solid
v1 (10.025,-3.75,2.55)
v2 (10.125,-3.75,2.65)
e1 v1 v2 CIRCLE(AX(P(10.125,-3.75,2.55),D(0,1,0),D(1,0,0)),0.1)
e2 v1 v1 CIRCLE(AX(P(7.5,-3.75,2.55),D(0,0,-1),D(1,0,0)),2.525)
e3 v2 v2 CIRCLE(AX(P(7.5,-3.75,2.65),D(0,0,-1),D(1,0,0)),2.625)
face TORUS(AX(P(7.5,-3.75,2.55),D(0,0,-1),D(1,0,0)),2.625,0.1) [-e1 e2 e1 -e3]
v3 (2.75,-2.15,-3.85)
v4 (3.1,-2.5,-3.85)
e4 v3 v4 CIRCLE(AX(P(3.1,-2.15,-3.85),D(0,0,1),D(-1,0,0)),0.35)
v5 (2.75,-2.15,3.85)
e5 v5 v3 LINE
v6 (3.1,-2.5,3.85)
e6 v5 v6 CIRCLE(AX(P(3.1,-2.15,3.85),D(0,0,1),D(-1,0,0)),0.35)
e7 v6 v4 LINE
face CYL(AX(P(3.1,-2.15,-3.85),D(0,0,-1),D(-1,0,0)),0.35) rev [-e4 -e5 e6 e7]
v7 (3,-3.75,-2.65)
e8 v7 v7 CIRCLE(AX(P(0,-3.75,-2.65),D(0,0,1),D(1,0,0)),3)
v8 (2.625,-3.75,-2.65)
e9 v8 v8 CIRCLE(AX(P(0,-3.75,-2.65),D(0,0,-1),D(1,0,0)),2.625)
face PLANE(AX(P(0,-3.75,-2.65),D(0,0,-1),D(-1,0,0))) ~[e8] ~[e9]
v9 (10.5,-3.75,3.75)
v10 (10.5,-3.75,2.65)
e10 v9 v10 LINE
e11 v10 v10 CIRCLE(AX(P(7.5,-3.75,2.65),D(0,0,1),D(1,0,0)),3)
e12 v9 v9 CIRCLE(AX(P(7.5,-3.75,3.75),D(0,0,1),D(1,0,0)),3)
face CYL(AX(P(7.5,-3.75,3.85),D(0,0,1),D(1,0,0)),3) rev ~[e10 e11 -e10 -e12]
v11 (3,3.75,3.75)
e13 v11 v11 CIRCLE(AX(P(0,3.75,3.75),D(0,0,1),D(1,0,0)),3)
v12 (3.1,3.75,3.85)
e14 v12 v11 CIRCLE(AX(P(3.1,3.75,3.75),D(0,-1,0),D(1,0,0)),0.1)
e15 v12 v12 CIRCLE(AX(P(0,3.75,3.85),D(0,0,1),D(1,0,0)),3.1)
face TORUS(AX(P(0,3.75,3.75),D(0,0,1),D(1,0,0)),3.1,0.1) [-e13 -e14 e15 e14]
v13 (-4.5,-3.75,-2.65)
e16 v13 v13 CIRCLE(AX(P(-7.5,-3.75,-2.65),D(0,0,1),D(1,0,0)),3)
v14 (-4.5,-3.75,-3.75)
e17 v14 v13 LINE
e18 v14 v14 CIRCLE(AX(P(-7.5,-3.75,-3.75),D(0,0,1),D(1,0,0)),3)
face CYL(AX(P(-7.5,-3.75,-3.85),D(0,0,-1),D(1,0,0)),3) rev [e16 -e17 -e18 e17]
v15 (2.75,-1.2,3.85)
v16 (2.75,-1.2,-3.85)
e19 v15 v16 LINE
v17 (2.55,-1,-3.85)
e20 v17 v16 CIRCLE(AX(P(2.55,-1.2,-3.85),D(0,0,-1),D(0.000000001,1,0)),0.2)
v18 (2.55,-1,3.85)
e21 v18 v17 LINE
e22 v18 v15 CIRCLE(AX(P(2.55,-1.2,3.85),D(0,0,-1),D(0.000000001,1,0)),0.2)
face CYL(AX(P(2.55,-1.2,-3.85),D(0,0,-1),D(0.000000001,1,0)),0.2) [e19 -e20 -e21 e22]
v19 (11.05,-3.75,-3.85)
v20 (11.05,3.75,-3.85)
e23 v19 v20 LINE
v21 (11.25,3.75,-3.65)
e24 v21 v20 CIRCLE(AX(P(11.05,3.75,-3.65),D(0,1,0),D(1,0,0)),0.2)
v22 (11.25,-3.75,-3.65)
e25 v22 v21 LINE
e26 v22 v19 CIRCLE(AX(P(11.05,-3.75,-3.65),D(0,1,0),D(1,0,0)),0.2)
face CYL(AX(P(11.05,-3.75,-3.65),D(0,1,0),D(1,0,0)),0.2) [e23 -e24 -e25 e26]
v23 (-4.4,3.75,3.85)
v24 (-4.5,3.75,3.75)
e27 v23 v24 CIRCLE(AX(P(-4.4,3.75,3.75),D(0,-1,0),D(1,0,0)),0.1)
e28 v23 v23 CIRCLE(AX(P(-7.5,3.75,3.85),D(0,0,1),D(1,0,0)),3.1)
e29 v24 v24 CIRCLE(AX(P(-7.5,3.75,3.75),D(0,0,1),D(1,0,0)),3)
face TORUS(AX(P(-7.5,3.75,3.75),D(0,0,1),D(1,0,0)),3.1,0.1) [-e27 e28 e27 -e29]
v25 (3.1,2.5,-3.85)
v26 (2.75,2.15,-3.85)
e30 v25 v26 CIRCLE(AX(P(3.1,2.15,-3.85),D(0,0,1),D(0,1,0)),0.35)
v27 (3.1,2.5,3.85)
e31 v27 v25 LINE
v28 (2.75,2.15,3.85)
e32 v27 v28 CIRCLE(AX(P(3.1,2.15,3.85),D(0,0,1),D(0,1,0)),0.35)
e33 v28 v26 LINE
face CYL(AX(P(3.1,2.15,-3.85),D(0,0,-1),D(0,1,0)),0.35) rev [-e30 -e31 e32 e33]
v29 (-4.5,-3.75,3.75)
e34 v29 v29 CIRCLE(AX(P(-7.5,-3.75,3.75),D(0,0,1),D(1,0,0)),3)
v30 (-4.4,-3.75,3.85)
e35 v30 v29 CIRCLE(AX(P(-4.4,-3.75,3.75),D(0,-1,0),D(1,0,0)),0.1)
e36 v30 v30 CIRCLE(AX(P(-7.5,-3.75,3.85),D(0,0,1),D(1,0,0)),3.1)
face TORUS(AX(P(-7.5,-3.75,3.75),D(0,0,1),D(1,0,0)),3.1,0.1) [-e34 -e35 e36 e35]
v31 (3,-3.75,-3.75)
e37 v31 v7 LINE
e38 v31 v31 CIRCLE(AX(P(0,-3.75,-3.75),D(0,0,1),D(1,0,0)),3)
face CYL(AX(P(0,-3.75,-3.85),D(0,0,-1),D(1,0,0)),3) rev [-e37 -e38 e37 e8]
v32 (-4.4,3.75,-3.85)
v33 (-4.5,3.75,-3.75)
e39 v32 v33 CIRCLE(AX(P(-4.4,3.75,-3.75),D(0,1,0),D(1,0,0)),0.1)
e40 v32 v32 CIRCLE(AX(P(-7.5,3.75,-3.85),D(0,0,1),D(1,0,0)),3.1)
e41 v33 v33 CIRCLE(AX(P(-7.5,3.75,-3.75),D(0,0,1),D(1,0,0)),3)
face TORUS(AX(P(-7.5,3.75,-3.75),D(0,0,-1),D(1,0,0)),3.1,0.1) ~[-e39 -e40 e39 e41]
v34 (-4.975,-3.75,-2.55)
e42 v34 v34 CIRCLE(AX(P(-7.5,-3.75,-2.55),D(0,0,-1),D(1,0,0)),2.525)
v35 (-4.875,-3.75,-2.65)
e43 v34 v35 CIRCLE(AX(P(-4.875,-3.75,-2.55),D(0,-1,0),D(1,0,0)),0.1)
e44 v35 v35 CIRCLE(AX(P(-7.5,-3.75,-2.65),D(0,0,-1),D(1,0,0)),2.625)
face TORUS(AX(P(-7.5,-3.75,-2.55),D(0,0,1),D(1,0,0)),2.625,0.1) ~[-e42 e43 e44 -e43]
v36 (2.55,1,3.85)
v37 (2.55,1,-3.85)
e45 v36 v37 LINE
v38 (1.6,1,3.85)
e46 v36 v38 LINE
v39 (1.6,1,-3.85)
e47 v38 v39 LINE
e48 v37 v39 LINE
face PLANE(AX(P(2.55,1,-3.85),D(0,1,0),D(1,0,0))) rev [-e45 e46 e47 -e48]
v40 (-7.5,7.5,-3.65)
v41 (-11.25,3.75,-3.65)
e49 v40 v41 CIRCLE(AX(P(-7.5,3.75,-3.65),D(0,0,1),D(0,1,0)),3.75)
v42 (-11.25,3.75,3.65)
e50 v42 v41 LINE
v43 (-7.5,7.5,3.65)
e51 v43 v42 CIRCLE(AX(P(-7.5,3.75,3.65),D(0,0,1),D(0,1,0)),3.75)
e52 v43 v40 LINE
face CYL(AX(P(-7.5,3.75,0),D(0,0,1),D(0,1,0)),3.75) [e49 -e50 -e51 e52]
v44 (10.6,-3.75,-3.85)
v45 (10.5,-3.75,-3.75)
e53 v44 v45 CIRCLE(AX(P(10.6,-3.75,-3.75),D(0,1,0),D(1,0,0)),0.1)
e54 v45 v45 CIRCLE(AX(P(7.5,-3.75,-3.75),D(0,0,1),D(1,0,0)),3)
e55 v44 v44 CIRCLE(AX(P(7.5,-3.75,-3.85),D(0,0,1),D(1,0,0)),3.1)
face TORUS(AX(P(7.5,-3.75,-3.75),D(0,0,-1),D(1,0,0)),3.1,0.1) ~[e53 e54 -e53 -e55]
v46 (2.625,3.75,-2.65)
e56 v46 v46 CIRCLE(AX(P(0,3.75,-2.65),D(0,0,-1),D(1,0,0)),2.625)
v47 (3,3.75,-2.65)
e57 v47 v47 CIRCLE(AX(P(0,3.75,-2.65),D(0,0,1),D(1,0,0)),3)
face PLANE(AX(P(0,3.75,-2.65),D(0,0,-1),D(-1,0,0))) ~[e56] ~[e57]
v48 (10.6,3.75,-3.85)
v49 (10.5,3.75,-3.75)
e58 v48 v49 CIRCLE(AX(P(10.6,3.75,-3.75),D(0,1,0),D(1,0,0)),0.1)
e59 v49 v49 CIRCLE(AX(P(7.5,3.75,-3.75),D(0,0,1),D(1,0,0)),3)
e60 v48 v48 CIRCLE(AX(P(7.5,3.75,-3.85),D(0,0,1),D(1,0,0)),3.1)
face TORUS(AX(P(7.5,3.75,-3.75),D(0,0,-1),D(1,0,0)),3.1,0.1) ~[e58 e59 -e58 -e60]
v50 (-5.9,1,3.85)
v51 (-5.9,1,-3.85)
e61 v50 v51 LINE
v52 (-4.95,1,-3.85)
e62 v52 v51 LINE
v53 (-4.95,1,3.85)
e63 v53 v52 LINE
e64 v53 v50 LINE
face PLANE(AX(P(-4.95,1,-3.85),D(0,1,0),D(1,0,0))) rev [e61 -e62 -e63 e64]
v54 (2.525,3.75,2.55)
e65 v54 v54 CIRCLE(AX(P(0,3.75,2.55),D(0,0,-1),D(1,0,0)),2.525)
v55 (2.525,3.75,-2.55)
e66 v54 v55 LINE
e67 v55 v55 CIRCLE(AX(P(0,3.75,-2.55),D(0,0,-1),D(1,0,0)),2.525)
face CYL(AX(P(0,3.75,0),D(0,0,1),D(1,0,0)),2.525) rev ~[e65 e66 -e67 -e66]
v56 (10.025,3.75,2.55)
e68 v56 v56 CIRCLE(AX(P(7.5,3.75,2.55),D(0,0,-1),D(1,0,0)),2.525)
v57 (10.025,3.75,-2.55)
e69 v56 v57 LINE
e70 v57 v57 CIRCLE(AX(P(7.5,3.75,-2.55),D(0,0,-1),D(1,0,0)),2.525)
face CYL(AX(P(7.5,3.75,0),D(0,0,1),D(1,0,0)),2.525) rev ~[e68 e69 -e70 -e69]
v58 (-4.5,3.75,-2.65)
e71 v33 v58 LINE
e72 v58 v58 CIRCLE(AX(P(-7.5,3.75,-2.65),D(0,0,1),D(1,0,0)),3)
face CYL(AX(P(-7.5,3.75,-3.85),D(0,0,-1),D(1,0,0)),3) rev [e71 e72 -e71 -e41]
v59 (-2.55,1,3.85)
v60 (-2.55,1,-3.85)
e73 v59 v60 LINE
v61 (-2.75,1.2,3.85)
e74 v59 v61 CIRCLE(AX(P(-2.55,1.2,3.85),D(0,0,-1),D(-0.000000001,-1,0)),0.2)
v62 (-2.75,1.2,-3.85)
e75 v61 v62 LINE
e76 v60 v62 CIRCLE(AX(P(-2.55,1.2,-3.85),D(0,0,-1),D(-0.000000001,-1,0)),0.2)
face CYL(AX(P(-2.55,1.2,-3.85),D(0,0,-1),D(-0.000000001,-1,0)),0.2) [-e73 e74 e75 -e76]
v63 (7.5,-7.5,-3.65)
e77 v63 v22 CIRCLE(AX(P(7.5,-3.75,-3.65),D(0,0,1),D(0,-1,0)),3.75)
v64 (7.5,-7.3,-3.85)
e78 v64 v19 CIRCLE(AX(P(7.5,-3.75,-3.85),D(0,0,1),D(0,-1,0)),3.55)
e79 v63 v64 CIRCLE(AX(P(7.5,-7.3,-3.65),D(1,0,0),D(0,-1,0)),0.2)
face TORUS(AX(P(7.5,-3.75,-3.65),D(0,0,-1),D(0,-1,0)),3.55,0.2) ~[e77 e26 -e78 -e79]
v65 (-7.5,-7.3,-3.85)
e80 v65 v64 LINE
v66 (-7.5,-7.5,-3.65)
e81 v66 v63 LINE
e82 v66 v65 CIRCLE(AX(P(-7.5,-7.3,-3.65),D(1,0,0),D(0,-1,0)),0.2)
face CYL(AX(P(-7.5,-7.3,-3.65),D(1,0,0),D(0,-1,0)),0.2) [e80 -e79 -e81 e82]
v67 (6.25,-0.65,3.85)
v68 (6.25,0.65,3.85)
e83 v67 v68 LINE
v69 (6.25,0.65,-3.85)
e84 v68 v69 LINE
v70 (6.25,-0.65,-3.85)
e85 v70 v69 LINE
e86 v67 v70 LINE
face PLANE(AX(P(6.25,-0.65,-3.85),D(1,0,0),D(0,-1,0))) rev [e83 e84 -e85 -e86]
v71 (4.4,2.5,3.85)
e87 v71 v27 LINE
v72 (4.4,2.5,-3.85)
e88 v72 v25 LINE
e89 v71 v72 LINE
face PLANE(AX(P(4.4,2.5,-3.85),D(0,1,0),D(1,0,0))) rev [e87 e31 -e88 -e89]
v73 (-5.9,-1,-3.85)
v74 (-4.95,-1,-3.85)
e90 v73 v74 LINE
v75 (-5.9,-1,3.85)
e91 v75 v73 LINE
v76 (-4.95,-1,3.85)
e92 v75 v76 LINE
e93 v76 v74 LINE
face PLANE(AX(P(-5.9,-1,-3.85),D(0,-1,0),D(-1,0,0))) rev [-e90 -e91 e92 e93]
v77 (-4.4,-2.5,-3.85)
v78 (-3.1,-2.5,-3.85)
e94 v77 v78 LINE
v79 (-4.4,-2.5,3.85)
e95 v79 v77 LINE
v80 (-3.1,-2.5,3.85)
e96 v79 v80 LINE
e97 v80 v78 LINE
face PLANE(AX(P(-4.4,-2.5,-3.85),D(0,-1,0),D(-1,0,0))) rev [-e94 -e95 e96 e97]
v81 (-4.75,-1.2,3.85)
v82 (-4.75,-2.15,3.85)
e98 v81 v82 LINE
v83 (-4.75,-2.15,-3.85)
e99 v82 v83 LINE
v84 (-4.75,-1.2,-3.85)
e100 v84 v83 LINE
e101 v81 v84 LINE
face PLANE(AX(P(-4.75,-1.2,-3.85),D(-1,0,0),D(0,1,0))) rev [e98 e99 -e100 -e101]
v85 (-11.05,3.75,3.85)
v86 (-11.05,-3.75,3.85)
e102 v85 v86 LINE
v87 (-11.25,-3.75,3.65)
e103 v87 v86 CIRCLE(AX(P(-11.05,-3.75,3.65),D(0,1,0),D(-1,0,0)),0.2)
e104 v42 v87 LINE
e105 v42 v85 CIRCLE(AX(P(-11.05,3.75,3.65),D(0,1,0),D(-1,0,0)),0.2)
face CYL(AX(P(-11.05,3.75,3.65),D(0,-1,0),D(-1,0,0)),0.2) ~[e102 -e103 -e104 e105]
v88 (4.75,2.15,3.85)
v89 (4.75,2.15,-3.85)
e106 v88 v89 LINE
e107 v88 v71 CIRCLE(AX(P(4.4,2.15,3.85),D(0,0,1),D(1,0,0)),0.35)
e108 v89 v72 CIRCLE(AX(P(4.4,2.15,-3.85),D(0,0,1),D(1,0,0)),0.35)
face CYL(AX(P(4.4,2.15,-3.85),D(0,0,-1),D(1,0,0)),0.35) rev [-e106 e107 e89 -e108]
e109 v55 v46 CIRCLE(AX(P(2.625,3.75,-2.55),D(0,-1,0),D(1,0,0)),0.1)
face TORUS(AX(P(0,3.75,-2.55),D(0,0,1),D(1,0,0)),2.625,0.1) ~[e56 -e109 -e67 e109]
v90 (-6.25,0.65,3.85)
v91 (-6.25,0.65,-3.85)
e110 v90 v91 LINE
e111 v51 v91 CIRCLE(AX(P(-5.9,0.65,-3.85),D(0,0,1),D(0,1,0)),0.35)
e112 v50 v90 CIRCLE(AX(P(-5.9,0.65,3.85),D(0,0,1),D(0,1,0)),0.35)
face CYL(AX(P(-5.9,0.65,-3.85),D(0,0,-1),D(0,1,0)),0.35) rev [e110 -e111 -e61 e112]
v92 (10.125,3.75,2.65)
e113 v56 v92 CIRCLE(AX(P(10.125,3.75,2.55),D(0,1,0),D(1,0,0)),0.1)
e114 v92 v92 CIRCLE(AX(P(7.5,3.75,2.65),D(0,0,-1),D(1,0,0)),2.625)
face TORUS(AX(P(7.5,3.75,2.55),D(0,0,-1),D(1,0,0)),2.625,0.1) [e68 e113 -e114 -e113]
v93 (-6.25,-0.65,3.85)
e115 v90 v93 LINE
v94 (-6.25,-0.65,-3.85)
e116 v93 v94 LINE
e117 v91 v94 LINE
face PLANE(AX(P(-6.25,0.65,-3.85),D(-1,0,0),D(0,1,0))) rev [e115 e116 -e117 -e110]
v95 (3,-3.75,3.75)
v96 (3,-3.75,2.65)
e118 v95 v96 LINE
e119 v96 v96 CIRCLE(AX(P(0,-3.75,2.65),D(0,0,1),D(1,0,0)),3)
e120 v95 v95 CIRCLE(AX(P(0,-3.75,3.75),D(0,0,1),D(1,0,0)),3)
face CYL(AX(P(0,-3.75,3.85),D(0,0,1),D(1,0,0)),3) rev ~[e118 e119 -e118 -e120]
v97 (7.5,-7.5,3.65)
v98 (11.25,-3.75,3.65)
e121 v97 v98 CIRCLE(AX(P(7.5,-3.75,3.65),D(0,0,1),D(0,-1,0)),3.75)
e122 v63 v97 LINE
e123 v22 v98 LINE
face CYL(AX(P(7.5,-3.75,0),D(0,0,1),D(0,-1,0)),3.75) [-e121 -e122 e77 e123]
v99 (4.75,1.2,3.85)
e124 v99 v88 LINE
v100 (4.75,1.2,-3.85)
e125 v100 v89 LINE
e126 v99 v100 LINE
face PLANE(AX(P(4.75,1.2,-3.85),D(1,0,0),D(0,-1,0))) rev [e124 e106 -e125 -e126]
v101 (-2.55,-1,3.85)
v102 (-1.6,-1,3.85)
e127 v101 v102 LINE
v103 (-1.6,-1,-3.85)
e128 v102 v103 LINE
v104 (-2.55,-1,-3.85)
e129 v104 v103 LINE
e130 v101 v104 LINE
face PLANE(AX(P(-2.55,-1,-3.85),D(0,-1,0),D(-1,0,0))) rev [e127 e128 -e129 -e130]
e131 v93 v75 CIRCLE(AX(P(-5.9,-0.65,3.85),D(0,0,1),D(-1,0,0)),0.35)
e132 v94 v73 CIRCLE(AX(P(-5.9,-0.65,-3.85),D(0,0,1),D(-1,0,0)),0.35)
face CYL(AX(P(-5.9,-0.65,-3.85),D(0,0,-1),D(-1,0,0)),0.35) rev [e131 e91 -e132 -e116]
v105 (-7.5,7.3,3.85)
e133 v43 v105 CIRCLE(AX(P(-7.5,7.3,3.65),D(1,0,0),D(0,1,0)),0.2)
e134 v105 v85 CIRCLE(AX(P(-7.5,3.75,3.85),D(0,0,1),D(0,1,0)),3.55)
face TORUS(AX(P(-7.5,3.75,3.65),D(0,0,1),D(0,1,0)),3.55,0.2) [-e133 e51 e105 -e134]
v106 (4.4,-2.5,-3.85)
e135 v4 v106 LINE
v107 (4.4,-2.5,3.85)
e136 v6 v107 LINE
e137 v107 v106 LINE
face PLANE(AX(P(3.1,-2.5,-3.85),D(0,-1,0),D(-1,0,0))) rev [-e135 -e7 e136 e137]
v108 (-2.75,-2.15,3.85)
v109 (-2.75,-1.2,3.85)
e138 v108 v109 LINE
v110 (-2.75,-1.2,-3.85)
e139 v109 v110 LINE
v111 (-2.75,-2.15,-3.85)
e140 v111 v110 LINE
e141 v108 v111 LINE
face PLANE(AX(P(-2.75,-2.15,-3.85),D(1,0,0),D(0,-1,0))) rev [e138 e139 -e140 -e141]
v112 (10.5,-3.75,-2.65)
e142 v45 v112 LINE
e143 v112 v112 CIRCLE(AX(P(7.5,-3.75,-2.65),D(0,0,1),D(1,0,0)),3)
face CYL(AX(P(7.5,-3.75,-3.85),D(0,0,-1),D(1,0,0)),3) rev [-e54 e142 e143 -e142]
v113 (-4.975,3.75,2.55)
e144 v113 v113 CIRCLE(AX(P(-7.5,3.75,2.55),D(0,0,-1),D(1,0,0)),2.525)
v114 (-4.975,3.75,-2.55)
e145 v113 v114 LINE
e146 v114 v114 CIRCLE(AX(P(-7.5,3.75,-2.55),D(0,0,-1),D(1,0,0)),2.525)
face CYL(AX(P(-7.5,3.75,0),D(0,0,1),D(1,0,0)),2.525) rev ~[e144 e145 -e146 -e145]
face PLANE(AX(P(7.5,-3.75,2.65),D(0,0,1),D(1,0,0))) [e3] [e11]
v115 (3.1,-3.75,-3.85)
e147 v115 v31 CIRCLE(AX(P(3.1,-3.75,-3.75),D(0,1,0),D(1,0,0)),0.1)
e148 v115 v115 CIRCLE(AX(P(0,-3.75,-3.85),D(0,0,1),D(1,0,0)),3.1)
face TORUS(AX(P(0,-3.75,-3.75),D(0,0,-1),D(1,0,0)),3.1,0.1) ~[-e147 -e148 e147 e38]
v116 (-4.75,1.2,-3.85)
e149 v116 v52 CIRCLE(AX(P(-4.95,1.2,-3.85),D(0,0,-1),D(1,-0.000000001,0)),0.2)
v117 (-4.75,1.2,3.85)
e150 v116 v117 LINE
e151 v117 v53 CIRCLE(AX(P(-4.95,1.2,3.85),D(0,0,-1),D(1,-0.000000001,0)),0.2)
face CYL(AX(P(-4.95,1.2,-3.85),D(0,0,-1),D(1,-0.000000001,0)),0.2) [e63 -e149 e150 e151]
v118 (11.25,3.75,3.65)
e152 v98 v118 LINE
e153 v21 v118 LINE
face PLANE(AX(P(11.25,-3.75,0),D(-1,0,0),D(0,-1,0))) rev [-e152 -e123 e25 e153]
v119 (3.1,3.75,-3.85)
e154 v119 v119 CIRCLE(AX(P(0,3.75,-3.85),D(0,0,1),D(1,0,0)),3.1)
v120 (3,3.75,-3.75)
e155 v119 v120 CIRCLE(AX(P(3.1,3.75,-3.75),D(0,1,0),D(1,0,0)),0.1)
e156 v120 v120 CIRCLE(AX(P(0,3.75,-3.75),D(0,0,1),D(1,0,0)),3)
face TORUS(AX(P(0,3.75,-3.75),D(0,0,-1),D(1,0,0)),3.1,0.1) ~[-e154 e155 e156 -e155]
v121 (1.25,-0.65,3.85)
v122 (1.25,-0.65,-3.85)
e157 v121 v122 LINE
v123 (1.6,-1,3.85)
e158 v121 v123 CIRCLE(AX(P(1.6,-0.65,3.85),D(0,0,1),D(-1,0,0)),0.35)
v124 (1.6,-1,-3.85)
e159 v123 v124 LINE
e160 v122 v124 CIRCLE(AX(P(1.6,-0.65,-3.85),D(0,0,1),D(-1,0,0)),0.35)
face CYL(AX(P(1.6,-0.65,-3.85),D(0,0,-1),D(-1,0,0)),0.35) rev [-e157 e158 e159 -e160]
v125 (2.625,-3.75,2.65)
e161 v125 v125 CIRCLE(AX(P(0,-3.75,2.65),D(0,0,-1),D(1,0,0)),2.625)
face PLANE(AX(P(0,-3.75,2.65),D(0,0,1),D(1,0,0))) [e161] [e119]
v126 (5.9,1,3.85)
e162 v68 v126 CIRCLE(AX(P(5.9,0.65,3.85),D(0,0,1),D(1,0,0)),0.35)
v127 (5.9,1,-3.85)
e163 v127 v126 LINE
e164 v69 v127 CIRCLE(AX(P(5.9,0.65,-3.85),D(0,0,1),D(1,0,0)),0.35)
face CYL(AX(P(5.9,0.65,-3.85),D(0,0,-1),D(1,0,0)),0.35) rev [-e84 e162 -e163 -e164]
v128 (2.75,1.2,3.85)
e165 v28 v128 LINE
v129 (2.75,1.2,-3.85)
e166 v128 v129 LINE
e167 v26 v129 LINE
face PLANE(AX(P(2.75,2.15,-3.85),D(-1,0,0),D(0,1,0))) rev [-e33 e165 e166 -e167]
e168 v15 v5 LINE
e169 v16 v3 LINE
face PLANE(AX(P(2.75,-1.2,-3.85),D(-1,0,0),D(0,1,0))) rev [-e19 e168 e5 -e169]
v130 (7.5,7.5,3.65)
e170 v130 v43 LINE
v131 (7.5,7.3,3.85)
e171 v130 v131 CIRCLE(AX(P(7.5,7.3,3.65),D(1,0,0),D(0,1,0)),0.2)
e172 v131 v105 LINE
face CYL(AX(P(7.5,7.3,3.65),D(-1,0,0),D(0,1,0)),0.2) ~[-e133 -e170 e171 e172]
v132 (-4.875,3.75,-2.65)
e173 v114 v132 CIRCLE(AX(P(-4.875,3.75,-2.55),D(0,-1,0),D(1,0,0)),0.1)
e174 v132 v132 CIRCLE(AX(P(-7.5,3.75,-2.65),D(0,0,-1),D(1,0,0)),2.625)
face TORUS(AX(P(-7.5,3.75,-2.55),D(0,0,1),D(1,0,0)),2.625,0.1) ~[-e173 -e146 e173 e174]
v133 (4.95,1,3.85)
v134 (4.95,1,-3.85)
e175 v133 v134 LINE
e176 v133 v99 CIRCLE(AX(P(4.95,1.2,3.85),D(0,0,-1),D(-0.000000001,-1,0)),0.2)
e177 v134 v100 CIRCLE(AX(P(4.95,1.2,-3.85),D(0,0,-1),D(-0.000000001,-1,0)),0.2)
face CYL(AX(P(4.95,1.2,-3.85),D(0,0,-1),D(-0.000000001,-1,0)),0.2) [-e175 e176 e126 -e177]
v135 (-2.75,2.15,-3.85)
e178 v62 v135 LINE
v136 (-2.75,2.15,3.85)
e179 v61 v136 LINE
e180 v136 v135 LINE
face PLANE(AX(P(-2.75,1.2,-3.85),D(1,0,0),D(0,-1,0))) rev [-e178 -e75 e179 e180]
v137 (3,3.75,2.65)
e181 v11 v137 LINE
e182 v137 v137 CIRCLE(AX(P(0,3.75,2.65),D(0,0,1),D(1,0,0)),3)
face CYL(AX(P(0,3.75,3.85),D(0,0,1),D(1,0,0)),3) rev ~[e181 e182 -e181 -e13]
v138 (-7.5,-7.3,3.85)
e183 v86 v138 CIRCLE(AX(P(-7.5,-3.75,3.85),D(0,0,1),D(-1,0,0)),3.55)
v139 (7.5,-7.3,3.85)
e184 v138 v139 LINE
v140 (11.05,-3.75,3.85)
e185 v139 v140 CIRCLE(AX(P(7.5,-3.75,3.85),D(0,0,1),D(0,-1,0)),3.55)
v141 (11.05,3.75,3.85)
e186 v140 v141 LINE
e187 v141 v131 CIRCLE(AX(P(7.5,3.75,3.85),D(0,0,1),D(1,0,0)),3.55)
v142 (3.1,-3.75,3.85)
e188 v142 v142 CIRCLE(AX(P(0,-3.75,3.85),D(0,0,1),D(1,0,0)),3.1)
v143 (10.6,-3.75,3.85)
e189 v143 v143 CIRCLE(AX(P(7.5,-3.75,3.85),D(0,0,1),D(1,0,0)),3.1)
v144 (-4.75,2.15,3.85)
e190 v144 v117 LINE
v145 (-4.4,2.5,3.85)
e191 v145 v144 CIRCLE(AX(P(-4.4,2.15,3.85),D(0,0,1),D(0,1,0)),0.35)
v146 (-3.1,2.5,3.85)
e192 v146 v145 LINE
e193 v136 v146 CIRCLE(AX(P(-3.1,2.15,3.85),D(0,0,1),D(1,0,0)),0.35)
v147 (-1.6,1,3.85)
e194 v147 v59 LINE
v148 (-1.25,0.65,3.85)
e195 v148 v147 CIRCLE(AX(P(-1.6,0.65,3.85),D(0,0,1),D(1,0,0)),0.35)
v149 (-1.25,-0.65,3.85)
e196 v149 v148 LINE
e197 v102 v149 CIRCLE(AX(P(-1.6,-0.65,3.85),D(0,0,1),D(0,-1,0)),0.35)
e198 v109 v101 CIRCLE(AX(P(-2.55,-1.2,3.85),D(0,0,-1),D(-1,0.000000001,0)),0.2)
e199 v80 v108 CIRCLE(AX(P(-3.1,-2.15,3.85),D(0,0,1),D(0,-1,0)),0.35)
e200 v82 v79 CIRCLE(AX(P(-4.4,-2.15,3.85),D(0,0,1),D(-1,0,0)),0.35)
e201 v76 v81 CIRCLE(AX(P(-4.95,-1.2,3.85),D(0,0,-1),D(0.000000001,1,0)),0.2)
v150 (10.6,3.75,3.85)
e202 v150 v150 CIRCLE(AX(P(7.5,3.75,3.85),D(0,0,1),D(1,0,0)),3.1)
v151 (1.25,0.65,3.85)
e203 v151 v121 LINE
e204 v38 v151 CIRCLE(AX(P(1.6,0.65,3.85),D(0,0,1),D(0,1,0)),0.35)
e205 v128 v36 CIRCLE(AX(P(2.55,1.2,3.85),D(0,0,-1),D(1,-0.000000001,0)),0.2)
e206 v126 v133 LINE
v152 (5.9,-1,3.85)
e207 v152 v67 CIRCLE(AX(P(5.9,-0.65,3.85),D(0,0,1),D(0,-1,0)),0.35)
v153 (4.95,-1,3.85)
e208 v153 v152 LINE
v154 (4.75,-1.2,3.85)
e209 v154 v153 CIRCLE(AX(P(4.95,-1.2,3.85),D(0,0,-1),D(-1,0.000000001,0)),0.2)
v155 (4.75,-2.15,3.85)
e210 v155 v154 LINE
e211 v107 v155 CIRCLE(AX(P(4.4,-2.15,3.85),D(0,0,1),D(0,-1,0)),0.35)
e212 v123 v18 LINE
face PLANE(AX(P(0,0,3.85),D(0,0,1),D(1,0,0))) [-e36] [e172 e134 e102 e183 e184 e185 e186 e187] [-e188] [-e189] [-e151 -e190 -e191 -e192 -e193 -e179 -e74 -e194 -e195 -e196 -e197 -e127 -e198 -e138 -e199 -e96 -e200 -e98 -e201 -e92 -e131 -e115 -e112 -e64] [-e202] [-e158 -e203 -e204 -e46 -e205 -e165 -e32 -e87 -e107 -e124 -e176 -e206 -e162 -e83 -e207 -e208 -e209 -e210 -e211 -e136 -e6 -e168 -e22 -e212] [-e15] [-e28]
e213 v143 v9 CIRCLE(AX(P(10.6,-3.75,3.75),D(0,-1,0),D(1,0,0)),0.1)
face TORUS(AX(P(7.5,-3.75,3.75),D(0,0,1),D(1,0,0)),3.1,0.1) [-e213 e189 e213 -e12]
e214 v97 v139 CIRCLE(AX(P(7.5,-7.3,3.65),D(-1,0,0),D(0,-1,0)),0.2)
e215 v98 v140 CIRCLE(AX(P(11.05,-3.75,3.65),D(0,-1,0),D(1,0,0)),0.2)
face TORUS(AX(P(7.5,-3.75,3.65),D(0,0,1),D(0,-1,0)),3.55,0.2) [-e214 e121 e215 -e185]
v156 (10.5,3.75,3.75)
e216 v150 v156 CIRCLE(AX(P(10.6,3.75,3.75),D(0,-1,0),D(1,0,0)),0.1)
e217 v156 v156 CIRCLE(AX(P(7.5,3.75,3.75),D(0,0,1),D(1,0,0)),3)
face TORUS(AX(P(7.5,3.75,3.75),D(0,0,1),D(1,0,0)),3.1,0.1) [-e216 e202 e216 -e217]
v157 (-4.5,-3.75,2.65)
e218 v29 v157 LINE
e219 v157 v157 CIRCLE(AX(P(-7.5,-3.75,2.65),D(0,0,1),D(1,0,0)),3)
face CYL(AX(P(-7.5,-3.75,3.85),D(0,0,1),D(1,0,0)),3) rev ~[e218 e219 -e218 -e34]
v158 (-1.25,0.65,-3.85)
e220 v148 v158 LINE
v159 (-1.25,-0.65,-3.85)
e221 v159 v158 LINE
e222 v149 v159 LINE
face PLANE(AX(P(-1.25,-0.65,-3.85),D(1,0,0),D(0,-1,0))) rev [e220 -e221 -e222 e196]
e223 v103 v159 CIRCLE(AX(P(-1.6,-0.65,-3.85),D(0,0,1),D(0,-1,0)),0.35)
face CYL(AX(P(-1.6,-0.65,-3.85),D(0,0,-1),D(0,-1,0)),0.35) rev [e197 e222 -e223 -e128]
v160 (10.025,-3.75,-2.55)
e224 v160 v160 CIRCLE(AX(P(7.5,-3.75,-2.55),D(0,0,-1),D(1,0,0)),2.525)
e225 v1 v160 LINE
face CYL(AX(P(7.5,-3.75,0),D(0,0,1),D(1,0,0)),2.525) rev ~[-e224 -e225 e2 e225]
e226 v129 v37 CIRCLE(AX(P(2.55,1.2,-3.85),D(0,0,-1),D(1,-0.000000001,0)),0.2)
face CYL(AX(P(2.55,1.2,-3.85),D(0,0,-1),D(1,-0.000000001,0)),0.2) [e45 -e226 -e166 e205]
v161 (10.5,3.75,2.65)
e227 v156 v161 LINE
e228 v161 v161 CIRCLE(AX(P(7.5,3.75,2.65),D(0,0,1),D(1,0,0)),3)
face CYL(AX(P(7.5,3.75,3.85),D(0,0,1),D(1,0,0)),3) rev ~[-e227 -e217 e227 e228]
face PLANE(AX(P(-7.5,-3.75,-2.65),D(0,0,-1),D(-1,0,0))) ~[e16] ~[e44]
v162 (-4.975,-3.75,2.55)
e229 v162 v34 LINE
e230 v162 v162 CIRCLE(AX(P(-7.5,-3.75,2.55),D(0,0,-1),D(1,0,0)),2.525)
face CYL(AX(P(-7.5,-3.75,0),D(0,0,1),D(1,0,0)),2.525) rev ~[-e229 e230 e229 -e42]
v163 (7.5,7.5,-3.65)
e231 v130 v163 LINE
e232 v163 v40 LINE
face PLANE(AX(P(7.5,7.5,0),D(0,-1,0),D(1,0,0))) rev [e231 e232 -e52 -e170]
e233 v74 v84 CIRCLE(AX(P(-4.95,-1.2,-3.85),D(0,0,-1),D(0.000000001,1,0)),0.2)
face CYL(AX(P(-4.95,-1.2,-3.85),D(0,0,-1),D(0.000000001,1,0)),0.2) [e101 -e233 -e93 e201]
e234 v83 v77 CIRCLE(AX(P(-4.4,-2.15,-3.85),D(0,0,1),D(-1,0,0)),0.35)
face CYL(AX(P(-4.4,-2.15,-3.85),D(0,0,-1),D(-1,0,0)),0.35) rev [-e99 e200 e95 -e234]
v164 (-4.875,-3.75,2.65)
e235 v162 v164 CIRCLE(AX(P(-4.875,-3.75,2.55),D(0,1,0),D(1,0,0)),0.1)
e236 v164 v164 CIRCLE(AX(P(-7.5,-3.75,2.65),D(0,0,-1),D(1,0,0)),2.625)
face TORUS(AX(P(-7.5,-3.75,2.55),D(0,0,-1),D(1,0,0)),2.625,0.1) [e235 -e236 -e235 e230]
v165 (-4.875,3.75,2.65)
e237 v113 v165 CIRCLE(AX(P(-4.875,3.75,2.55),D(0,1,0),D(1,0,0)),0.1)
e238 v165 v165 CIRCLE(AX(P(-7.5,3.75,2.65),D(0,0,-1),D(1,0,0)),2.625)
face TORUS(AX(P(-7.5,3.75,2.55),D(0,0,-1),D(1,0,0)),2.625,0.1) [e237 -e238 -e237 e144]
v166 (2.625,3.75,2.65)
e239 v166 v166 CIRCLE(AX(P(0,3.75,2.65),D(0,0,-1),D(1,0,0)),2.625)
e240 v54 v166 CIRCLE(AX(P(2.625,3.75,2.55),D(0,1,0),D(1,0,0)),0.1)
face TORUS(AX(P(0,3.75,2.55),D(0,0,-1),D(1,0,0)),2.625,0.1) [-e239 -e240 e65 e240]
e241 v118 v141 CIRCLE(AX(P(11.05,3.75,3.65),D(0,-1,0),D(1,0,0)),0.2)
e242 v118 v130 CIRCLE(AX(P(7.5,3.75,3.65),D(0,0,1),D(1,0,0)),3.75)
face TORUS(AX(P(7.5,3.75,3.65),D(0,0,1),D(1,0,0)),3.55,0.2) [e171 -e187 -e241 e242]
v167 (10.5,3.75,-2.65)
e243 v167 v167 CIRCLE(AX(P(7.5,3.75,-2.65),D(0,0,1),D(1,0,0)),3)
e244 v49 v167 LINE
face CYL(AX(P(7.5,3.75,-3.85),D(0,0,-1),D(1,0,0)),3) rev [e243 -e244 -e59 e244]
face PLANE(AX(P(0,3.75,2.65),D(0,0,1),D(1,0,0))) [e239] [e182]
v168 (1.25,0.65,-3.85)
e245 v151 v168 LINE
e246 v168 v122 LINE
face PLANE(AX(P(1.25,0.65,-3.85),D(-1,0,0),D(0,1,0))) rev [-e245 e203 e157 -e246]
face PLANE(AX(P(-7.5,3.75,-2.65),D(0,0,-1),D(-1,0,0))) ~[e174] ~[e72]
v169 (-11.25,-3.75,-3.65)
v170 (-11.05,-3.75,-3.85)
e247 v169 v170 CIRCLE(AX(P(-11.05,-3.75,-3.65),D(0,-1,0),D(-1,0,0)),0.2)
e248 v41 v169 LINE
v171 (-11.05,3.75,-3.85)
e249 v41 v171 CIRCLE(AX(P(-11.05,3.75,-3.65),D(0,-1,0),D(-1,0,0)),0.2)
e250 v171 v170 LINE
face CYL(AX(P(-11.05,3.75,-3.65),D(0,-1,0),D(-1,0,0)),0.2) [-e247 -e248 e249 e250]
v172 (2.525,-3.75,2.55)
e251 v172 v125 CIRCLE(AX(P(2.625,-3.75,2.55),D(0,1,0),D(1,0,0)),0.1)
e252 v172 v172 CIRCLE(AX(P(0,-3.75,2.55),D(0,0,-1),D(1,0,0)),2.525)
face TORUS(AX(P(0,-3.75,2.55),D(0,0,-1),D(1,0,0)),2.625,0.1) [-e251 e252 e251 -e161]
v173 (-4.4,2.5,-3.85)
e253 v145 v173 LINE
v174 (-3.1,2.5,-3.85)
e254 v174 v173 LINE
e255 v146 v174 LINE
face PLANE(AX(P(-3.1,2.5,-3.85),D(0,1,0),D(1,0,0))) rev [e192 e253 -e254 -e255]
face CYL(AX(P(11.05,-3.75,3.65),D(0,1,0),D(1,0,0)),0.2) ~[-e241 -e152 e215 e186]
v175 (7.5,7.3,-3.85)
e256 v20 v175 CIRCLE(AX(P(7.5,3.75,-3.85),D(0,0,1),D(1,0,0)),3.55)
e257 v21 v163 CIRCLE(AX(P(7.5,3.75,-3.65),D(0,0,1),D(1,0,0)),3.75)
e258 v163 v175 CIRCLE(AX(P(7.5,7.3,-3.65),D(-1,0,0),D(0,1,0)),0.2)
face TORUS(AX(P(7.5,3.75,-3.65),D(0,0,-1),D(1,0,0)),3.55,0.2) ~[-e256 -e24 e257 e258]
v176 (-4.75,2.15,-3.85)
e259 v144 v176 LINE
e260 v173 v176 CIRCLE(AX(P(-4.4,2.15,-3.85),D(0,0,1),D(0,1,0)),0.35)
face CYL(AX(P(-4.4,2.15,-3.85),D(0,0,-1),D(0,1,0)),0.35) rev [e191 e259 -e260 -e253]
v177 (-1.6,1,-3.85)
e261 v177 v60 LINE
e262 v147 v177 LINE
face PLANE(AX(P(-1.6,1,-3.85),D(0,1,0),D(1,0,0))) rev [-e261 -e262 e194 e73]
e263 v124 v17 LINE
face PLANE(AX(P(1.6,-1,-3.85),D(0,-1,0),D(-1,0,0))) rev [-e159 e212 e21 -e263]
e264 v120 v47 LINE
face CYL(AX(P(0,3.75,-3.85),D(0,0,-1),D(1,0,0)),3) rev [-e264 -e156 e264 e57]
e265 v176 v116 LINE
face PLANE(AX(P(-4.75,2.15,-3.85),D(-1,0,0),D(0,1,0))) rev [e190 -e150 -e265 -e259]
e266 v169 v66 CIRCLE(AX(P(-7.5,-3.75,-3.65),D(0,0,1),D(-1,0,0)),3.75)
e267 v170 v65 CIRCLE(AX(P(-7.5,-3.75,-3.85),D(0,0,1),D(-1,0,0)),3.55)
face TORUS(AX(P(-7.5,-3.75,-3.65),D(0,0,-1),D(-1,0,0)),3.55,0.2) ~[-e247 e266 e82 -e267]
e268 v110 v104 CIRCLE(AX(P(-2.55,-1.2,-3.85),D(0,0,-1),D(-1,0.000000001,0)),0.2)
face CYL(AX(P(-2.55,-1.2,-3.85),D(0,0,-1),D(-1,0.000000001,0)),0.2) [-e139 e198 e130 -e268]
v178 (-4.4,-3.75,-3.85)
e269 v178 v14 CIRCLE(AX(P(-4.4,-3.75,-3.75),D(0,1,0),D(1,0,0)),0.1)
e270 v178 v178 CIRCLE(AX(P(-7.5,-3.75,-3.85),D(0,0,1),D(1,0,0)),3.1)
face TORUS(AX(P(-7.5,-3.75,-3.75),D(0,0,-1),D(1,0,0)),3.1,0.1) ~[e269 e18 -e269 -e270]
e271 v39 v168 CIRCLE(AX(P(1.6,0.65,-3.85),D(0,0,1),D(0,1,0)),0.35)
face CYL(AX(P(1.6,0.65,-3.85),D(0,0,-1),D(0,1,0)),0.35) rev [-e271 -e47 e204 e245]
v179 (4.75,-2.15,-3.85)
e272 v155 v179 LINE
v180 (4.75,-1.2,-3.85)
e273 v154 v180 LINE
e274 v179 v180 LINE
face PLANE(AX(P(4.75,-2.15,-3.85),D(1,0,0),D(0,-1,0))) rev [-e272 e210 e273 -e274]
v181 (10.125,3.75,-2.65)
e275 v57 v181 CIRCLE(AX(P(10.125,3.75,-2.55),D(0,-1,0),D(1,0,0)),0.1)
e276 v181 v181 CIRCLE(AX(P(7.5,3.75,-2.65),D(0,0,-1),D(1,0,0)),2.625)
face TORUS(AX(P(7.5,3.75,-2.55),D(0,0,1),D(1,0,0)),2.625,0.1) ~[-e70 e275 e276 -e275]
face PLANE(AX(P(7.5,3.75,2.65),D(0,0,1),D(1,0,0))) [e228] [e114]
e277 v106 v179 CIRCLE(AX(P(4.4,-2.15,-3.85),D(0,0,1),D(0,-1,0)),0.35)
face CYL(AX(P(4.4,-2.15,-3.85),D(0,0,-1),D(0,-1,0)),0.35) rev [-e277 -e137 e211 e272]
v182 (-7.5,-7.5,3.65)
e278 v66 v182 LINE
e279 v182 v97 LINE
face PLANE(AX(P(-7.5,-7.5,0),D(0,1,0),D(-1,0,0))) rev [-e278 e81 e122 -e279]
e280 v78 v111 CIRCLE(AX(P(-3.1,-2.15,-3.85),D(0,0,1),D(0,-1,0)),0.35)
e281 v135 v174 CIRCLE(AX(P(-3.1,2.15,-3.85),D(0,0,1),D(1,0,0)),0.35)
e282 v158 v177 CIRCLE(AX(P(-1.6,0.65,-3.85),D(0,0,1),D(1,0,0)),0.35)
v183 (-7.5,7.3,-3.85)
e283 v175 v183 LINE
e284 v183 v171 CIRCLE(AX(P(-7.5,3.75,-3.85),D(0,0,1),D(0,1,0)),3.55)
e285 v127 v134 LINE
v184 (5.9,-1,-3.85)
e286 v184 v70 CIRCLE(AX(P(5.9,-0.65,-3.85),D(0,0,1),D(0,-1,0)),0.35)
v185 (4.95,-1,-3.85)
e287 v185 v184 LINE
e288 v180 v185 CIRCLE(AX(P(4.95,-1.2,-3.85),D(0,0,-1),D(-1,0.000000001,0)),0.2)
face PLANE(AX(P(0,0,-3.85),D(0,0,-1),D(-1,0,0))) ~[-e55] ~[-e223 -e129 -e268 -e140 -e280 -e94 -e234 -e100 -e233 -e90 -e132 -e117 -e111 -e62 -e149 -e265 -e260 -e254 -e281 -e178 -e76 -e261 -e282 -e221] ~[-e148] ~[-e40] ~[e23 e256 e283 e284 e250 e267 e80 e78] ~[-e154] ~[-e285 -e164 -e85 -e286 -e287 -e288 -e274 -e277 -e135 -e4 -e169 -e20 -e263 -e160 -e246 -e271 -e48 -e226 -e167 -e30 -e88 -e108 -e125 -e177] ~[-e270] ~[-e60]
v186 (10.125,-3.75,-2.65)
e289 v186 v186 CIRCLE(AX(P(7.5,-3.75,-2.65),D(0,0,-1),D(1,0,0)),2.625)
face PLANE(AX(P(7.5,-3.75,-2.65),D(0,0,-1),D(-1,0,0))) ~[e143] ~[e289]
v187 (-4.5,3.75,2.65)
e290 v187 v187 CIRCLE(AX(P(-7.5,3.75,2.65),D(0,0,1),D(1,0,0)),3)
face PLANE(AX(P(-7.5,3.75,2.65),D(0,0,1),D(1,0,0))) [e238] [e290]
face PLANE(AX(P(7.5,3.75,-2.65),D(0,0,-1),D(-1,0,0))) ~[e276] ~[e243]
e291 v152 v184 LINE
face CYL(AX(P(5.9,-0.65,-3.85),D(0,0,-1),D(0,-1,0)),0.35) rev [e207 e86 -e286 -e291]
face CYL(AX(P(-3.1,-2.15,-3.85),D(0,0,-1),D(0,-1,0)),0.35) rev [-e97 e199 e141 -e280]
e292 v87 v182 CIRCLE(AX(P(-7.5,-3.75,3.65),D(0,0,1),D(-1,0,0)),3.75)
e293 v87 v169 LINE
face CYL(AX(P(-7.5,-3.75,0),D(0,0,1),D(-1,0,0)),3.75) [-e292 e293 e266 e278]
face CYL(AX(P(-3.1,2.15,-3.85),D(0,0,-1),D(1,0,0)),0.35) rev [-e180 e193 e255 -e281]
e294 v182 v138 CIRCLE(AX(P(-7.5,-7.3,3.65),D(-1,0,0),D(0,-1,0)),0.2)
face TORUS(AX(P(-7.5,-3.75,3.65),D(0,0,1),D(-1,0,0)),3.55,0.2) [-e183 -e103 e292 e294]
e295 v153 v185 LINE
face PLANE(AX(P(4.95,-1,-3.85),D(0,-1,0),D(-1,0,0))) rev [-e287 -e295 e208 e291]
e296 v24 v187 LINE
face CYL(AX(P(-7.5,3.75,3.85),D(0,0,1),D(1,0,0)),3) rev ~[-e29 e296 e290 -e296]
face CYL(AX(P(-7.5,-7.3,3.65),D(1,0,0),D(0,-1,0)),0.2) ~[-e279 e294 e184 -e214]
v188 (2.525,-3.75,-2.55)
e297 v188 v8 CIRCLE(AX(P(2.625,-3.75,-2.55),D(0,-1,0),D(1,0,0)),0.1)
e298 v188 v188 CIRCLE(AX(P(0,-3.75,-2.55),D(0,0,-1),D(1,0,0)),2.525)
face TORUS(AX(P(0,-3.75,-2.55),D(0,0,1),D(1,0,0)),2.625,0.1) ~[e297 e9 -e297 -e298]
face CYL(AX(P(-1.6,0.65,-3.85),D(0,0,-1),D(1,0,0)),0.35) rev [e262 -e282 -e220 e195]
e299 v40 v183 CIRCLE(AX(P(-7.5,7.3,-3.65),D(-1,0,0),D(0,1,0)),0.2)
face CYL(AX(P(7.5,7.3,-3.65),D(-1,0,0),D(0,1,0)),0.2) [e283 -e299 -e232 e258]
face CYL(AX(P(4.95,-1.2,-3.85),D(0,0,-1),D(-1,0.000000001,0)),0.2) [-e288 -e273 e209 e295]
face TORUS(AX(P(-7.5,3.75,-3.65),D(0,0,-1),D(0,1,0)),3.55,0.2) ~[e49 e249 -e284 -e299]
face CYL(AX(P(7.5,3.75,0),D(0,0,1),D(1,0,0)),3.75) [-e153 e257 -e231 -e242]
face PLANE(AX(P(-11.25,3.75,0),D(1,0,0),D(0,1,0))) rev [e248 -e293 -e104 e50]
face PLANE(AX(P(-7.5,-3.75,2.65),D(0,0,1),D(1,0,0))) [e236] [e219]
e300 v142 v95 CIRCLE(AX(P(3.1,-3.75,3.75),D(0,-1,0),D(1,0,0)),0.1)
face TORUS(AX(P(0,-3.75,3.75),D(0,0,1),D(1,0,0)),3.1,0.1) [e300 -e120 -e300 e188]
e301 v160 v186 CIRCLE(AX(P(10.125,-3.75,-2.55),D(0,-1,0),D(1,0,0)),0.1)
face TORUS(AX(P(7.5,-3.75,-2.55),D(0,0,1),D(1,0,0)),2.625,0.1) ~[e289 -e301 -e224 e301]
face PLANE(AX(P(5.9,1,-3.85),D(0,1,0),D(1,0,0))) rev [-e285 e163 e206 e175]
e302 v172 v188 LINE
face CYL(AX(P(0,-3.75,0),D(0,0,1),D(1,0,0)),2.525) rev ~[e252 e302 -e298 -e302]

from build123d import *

# Parameters (mm, degrees)
F0_R     = 2.525
F1_DEPTH = 3.85
F2_R     = 0.2
F3_R     = 3
F4_DEPTH = 1.2
F5_R     = 0.1
F6_W     = 5
F6_H     = 0.6
F7_DEPTH = 3.85


# Not quite as in the source:
# - a feature names something its author has since deleted; it is built from what else it names


with BuildPart() as f1:
    # F0 (on Top) → F1 (new body)
    with BuildSketch(Plane.XY):
        with BuildLine():
            Line((-7.5, -7.5), (7.5, -7.5))
            ThreePointArc((7.5, -7.5), (10.1516504294, -6.4016504294), (11.25, -3.75))
            Line((11.25, -3.75), (11.25, 3.75))
            ThreePointArc((11.25, 3.75), (10.1516504294, 6.4016504294), (7.5, 7.5))
            Line((7.5, 7.5), (-7.5, 7.5))
            ThreePointArc((-7.5, 7.5), (-10.1516504294, 6.4016504294), (-11.25, 3.75))
            Line((-11.25, 3.75), (-11.25, -3.75))
            ThreePointArc((-11.25, -3.75), (-10.1516504294, -6.4016504294), (-7.5, -7.5))
        make_face()
        with Locations((-7.5, -3.75)):
            Circle(F0_R, mode=Mode.SUBTRACT)
        with Locations((0, -3.75)):
            Circle(F0_R, mode=Mode.SUBTRACT)
        with Locations((7.5, -3.75)):
            Circle(F0_R, mode=Mode.SUBTRACT)
        with Locations((-7.5, 3.75)):
            Circle(F0_R, mode=Mode.SUBTRACT)
        with Locations((0, 3.75)):
            Circle(F0_R, mode=Mode.SUBTRACT)
        with Locations((7.5, 3.75)):
            Circle(F0_R, mode=Mode.SUBTRACT)
    extrude(amount=F1_DEPTH)

    # F2
    f2_edges = [f1.edges().sort_by_distance(p)[0] for p in [
        (-10.15165, -6.40165, 3.85),
        (0, -7.5, 3.85),
        (10.15165, -6.40165, 3.85),
        (11.25, 0, 3.85),
        (10.15165, 6.40165, 3.85),
        (0, 7.5, 3.85),
        (-10.15165, 6.40165, 3.85),
        (-11.25, 0, 3.85),
        (-10.025, -3.75, 3.85),
        (-2.525, -3.75, 3.85),
        (4.975, -3.75, 3.85),
        (-10.025, 3.75, 3.85),
        (-2.525, 3.75, 3.85),
        (4.975, 3.75, 3.85),
    ]]
    fillet(f2_edges, radius=F2_R)

    # F3 (on face) → F4 (cut)
    with BuildSketch(Plane.XY.offset(3.85)):
        with Locations((-7.5, 3.75)):
            Circle(F3_R)
        with Locations((7.5, 3.75)):
            Circle(F3_R)
        with Locations((7.5, -3.75)):
            Circle(F3_R)
        with Locations((-7.5, -3.75)):
            Circle(F3_R)
        with Locations((0, 3.75)):
            Circle(F3_R)
        with Locations((0, -3.75)):
            Circle(F3_R)
    extrude(amount=-F4_DEPTH, mode=Mode.SUBTRACT)

    # F5
    f5_edges = [f1.edges().sort_by_distance(p)[0] for p in [
        (-10.5, -3.75, 3.85),
        (-10.025, -3.75, 2.65),
        (-10.5, 3.75, 3.85),
        (-10.025, 3.75, 2.65),
        (4.5, 3.75, 3.85),
        (4.975, 3.75, 2.65),
        (4.975, -3.75, 2.65),
        (4.5, -3.75, 3.85),
        (-3, 3.75, 3.85),
        (-2.525, 3.75, 2.65),
        (-3, -3.75, 3.85),
        (-2.525, -3.75, 2.65),
    ]]
    fillet(f5_edges, radius=F5_R)

    # F6 (on face) → F7 (cut, through all)
    with BuildSketch(Plane.XY.offset(3.85)):
        with BuildLine():
            ThreePointArc((-4.75, 1.2), (-4.8085786438, 1.0585786438), (-4.95, 1))
            Line((-4.95, 1), (-5.9, 1))
            ThreePointArc((-5.9, 1), (-6.1474873734, 0.8974873734), (-6.25, 0.65))
            Line((-6.25, 0.65), (-6.25, 0.3000084442))
            Line((-6.25, 0.3000084442), (-1.25, 0.3000084442))
            Line((-1.25, 0.3000084442), (-1.25, 0.65))
            ThreePointArc((-1.25, 0.65), (-1.3525126266, 0.8974873734), (-1.6, 1))
            Line((-1.6, 1), (-2.55, 1))
            ThreePointArc((-2.55, 1), (-2.6914213562, 1.0585786438), (-2.75, 1.2))
            Line((-2.75, 1.2), (-2.75, 2.15))
            ThreePointArc((-2.75, 2.15), (-2.8525126266, 2.3974873734), (-3.1, 2.5))
            Line((-3.1, 2.5), (-4.4, 2.5))
            ThreePointArc((-4.4, 2.5), (-4.6474873734, 2.3974873734), (-4.75, 2.15))
            Line((-4.75, 2.15), (-4.75, 1.2))
        make_face()
        with BuildLine():
            Line((-1.25, -0.2999915558), (-6.25, -0.2999915558))
            Line((-6.25, -0.2999915558), (-6.25, -0.65))
            ThreePointArc((-6.25, -0.65), (-6.1474873734, -0.8974873734), (-5.9, -1))
            Line((-5.9, -1), (-4.95, -1))
            ThreePointArc((-4.95, -1), (-4.8085786438, -1.0585786438), (-4.75, -1.2))
            Line((-4.75, -1.2), (-4.75, -2.15))
            ThreePointArc((-4.75, -2.15), (-4.6474873734, -2.3974873734), (-4.4, -2.5))
            Line((-4.4, -2.5), (-3.1, -2.5))
            ThreePointArc((-3.1, -2.5), (-2.8525126266, -2.3974873734), (-2.75, -2.15))
            Line((-2.75, -2.15), (-2.75, -1.2))
            ThreePointArc((-2.75, -1.2), (-2.6914213562, -1.0585786438), (-2.55, -1))
            Line((-2.55, -1), (-1.6, -1))
            ThreePointArc((-1.6, -1), (-1.3525126266, -0.8974873734), (-1.25, -0.65))
            Line((-1.25, -0.65), (-1.25, -0.2999915558))
        make_face()
        with Locations((-3.75, 8.4442e-06)):
            Rectangle(F6_W, F6_H)
        with BuildLine():
            Line((5.9, 1), (4.95, 1))
            ThreePointArc((4.95, 1), (4.8085786438, 1.0585786438), (4.75, 1.2))
            Line((4.75, 1.2), (4.75, 2.15))
            ThreePointArc((4.75, 2.15), (4.6474873734, 2.3974873734), (4.4, 2.5))
            Line((4.4, 2.5), (3.1, 2.5))
            ThreePointArc((3.1, 2.5), (2.8525126266, 2.3974873734), (2.75, 2.15))
            Line((2.75, 2.15), (2.75, 1.2))
            ThreePointArc((2.75, 1.2), (2.6914213562, 1.0585786438), (2.55, 1))
            Line((2.55, 1), (1.6, 1))
            ThreePointArc((1.6, 1), (1.3525126266, 0.8974873734), (1.25, 0.65))
            Line((1.25, 0.65), (1.25, 0.3000084442))
            Line((1.25, 0.3000084442), (6.25, 0.3000084442))
            Line((6.25, 0.3000084442), (6.25, 0.65))
            ThreePointArc((6.25, 0.65), (6.1474873734, 0.8974873734), (5.9, 1))
        make_face()
        with Locations((3.75, 8.4442e-06)):
            Rectangle(F6_W, F6_H)
        with BuildLine():
            Line((6.25, -0.65), (6.25, -0.2999915558))
            Line((6.25, -0.2999915558), (1.25, -0.2999915558))
            Line((1.25, -0.2999915558), (1.25, -0.65))
            ThreePointArc((1.25, -0.65), (1.3525126266, -0.8974873734), (1.6, -1))
            Line((1.6, -1), (2.55, -1))
            ThreePointArc((2.55, -1), (2.6914213562, -1.0585786438), (2.75, -1.2))
            Line((2.75, -1.2), (2.75, -2.15))
            ThreePointArc((2.75, -2.15), (2.8525126266, -2.3974873734), (3.1, -2.5))
            Line((3.1, -2.5), (4.4, -2.5))
            ThreePointArc((4.4, -2.5), (4.6474873734, -2.3974873734), (4.75, -2.15))
            Line((4.75, -2.15), (4.75, -1.2))
            ThreePointArc((4.75, -1.2), (4.8085786438, -1.0585786438), (4.95, -1))
            Line((4.95, -1), (5.9, -1))
            ThreePointArc((5.9, -1), (6.1474873734, -0.8974873734), (6.25, -0.65))
        make_face()
    extrude(amount=-F7_DEPTH, mode=Mode.SUBTRACT)

    # F8: F1 across plane


with BuildPart() as f1_1:
    add(f1.part)
    add(f1.part.mirror(Plane.XY))


solid = f1_1.part
